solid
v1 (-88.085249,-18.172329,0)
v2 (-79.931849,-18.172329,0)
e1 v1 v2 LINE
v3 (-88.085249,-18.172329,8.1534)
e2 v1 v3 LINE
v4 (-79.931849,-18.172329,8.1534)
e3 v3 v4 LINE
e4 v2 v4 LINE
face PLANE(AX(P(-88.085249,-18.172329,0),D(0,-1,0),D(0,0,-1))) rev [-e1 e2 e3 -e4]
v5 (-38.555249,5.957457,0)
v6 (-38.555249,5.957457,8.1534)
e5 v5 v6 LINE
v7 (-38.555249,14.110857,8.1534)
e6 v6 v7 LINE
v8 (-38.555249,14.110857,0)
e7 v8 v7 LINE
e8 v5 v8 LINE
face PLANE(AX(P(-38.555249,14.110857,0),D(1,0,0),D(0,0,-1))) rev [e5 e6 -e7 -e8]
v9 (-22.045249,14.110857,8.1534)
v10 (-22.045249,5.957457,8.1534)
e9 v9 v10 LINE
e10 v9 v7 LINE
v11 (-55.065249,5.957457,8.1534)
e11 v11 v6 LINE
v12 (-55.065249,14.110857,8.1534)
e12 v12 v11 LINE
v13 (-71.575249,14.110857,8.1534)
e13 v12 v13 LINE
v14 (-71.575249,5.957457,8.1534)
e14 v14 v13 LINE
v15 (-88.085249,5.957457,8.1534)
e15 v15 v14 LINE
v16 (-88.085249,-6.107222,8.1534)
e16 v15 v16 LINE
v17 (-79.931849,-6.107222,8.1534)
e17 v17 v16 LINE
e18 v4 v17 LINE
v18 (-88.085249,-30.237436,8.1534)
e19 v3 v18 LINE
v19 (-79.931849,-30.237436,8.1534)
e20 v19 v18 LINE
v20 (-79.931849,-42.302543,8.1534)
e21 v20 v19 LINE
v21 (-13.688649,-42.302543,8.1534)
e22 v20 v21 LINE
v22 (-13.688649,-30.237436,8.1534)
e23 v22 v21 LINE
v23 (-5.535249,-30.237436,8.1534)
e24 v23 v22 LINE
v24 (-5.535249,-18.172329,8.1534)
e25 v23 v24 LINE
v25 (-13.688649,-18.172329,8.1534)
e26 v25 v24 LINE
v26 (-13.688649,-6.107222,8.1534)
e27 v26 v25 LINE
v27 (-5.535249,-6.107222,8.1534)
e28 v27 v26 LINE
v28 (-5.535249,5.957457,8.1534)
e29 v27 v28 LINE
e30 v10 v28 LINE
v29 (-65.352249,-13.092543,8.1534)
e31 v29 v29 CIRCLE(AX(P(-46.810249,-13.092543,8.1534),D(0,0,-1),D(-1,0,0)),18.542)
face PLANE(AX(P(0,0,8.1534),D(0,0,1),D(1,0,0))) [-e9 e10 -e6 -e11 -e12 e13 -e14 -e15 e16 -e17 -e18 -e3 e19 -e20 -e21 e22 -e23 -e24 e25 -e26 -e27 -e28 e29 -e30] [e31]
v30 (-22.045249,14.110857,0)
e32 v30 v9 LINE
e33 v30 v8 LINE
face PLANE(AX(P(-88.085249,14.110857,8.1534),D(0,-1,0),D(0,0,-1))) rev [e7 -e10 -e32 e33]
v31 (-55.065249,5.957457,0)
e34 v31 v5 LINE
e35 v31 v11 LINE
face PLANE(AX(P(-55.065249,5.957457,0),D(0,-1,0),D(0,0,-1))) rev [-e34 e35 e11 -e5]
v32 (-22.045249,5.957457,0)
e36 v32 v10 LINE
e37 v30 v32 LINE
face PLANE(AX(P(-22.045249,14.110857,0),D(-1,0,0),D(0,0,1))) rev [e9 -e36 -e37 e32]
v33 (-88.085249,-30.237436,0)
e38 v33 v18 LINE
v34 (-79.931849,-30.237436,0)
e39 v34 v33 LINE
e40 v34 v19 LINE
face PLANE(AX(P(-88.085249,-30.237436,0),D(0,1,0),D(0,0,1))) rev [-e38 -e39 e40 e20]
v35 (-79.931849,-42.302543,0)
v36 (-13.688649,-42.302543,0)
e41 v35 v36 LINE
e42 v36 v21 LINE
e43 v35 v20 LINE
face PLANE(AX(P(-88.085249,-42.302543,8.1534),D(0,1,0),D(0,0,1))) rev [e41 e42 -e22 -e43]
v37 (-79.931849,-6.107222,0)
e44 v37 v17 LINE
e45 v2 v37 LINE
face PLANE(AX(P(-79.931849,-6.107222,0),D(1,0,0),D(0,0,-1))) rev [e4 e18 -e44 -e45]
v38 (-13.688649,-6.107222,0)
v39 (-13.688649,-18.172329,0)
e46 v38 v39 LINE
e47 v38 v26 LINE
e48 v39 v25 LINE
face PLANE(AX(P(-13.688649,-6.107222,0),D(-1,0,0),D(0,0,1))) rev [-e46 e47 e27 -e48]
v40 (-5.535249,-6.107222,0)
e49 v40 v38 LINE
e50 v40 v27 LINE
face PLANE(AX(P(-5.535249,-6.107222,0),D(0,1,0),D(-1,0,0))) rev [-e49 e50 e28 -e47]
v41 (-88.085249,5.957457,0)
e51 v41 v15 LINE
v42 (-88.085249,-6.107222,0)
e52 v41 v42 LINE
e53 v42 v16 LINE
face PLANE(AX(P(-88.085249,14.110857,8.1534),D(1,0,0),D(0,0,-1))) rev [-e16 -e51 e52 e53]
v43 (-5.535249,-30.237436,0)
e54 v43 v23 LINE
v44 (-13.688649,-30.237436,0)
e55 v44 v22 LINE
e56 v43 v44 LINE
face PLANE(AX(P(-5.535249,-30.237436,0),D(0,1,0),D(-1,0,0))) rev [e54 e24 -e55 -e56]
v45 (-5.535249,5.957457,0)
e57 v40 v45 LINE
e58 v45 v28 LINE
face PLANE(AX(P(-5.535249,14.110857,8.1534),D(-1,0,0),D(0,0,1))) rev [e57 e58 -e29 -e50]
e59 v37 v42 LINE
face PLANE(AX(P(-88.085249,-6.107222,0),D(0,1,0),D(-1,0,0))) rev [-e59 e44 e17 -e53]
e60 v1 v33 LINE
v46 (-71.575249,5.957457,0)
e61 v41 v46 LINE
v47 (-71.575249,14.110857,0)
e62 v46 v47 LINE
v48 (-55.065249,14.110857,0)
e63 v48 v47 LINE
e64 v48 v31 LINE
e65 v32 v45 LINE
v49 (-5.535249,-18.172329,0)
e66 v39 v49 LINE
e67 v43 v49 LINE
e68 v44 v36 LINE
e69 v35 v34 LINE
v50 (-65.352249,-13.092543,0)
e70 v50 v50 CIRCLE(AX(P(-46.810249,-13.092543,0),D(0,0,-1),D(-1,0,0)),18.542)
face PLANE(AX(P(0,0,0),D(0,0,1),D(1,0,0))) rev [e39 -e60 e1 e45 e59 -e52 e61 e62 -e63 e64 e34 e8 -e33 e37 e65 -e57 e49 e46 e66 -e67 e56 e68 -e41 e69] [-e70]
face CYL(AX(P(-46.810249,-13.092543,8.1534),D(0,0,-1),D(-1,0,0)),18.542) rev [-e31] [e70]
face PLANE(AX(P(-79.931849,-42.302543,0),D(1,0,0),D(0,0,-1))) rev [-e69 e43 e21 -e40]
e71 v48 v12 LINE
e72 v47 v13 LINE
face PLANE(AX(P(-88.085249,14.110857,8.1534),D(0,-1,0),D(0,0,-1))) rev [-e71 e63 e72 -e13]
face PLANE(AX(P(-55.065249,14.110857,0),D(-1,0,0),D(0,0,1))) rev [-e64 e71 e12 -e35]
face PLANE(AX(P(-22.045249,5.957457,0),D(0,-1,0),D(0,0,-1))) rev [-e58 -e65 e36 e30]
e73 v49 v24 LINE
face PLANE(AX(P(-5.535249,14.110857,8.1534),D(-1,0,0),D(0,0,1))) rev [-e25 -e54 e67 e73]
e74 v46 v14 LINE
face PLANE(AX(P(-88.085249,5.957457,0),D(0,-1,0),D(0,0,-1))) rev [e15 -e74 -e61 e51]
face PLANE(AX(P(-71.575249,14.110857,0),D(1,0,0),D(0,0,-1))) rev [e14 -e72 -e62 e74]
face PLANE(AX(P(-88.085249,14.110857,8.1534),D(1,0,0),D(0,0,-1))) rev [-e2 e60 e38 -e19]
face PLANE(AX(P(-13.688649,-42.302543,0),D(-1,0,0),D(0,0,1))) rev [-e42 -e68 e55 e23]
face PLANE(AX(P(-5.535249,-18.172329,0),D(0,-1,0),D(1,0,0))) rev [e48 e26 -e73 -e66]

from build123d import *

# Parameters (mm, degrees)
SKETCH1_W                = 82.55
SKETCH1_H                = 56.4134
BOSS_EXTRUDE1_DEPTH      = 8.1534
CUT_EXTRUDE1_START       = -88.085249325
CUT_EXTRUDE1_OUTLINE_W   = 8.1534
CUT_EXTRUDE1_OUTLINE_H   = 8.1534
CUT_EXTRUDE1_DEPTH       = 16.51
CUT_EXTRUDE1_START_2     = -55.065249325
CUT_EXTRUDE1_2_OUTLINE_W = 8.1534
CUT_EXTRUDE1_2_OUTLINE_H = 8.1534
CUT_EXTRUDE1_2_DEPTH     = 16.51
CUT_EXTRUDE1_START_3     = -22.045249325
CUT_EXTRUDE1_3_OUTLINE_W = 8.1534
CUT_EXTRUDE1_3_OUTLINE_H = 8.1534
CUT_EXTRUDE1_3_DEPTH     = 16.51
SKETCH3_W                = 8.1534
SKETCH3_H                = 12.065106948
CUT_EXTRUDE2_DEPTH       = 99.056076844
SKETCH4_R                = 18.542
CUT_EXTRUDE3_DEPTH       = 99.056076844


# Read off the part's stored shape, not the designer's step: Cut-Extrude1
with BuildPart() as part:
    # Sketch1 → Boss-Extrude1 (new body)
    with BuildSketch(Plane.XY):
        with Locations((-46.810249325, -14.095842782)):
            Rectangle(SKETCH1_W, SKETCH1_H)
    extrude(amount=BOSS_EXTRUDE1_DEPTH)

    # Cut-Extrude1 outline → Cut-Extrude1 (cut)
    with BuildSketch(Plane.YZ.offset(CUT_EXTRUDE1_START)):
        with Locations((10.034157218, 4.0767)):
            Rectangle(CUT_EXTRUDE1_OUTLINE_W, CUT_EXTRUDE1_OUTLINE_H)
    extrude(amount=CUT_EXTRUDE1_DEPTH, mode=Mode.SUBTRACT)

    # Cut-Extrude1 2 outline → Cut-Extrude1 2 (cut)
    with BuildSketch(Plane.YZ.offset(CUT_EXTRUDE1_START_2)):
        with Locations((10.034157218, 4.0767)):
            Rectangle(CUT_EXTRUDE1_2_OUTLINE_W, CUT_EXTRUDE1_2_OUTLINE_H)
    extrude(amount=CUT_EXTRUDE1_2_DEPTH, mode=Mode.SUBTRACT)

    # Cut-Extrude1 3 outline → Cut-Extrude1 3 (cut)
    with BuildSketch(Plane.YZ.offset(CUT_EXTRUDE1_START_3)):
        with Locations((10.034157218, 4.0767)):
            Rectangle(CUT_EXTRUDE1_3_OUTLINE_W, CUT_EXTRUDE1_3_OUTLINE_H)
    extrude(amount=CUT_EXTRUDE1_3_DEPTH, mode=Mode.SUBTRACT)

    # Sketch3 → Cut-Extrude2 (cut, through all)
    with BuildSketch(Plane.XY.offset(8.1534)):
        with Locations((-84.008549325, -36.269989308)):
            Rectangle(SKETCH3_W, SKETCH3_H)
        with Locations((-84.008549325, -12.139775411)):
            Rectangle(SKETCH3_W, SKETCH3_H)
        with Locations((-9.611949325, -36.269989308)):
            Rectangle(SKETCH3_W, SKETCH3_H)
        with Locations((-9.611949325, -12.139775411)):
            Rectangle(SKETCH3_W, SKETCH3_H)
    extrude(amount=-CUT_EXTRUDE2_DEPTH, mode=Mode.SUBTRACT)

    # Sketch4 → Cut-Extrude3 (cut, through all)
    with BuildSketch(Plane(origin=(0, 0, 0), x_dir=(-1, 0, 0), z_dir=(0, 0, -1))):
        with Locations((46.810249325, -13.092542782)):
            Circle(SKETCH4_R)
    extrude(amount=-CUT_EXTRUDE3_DEPTH, mode=Mode.SUBTRACT)


solid = part.part
